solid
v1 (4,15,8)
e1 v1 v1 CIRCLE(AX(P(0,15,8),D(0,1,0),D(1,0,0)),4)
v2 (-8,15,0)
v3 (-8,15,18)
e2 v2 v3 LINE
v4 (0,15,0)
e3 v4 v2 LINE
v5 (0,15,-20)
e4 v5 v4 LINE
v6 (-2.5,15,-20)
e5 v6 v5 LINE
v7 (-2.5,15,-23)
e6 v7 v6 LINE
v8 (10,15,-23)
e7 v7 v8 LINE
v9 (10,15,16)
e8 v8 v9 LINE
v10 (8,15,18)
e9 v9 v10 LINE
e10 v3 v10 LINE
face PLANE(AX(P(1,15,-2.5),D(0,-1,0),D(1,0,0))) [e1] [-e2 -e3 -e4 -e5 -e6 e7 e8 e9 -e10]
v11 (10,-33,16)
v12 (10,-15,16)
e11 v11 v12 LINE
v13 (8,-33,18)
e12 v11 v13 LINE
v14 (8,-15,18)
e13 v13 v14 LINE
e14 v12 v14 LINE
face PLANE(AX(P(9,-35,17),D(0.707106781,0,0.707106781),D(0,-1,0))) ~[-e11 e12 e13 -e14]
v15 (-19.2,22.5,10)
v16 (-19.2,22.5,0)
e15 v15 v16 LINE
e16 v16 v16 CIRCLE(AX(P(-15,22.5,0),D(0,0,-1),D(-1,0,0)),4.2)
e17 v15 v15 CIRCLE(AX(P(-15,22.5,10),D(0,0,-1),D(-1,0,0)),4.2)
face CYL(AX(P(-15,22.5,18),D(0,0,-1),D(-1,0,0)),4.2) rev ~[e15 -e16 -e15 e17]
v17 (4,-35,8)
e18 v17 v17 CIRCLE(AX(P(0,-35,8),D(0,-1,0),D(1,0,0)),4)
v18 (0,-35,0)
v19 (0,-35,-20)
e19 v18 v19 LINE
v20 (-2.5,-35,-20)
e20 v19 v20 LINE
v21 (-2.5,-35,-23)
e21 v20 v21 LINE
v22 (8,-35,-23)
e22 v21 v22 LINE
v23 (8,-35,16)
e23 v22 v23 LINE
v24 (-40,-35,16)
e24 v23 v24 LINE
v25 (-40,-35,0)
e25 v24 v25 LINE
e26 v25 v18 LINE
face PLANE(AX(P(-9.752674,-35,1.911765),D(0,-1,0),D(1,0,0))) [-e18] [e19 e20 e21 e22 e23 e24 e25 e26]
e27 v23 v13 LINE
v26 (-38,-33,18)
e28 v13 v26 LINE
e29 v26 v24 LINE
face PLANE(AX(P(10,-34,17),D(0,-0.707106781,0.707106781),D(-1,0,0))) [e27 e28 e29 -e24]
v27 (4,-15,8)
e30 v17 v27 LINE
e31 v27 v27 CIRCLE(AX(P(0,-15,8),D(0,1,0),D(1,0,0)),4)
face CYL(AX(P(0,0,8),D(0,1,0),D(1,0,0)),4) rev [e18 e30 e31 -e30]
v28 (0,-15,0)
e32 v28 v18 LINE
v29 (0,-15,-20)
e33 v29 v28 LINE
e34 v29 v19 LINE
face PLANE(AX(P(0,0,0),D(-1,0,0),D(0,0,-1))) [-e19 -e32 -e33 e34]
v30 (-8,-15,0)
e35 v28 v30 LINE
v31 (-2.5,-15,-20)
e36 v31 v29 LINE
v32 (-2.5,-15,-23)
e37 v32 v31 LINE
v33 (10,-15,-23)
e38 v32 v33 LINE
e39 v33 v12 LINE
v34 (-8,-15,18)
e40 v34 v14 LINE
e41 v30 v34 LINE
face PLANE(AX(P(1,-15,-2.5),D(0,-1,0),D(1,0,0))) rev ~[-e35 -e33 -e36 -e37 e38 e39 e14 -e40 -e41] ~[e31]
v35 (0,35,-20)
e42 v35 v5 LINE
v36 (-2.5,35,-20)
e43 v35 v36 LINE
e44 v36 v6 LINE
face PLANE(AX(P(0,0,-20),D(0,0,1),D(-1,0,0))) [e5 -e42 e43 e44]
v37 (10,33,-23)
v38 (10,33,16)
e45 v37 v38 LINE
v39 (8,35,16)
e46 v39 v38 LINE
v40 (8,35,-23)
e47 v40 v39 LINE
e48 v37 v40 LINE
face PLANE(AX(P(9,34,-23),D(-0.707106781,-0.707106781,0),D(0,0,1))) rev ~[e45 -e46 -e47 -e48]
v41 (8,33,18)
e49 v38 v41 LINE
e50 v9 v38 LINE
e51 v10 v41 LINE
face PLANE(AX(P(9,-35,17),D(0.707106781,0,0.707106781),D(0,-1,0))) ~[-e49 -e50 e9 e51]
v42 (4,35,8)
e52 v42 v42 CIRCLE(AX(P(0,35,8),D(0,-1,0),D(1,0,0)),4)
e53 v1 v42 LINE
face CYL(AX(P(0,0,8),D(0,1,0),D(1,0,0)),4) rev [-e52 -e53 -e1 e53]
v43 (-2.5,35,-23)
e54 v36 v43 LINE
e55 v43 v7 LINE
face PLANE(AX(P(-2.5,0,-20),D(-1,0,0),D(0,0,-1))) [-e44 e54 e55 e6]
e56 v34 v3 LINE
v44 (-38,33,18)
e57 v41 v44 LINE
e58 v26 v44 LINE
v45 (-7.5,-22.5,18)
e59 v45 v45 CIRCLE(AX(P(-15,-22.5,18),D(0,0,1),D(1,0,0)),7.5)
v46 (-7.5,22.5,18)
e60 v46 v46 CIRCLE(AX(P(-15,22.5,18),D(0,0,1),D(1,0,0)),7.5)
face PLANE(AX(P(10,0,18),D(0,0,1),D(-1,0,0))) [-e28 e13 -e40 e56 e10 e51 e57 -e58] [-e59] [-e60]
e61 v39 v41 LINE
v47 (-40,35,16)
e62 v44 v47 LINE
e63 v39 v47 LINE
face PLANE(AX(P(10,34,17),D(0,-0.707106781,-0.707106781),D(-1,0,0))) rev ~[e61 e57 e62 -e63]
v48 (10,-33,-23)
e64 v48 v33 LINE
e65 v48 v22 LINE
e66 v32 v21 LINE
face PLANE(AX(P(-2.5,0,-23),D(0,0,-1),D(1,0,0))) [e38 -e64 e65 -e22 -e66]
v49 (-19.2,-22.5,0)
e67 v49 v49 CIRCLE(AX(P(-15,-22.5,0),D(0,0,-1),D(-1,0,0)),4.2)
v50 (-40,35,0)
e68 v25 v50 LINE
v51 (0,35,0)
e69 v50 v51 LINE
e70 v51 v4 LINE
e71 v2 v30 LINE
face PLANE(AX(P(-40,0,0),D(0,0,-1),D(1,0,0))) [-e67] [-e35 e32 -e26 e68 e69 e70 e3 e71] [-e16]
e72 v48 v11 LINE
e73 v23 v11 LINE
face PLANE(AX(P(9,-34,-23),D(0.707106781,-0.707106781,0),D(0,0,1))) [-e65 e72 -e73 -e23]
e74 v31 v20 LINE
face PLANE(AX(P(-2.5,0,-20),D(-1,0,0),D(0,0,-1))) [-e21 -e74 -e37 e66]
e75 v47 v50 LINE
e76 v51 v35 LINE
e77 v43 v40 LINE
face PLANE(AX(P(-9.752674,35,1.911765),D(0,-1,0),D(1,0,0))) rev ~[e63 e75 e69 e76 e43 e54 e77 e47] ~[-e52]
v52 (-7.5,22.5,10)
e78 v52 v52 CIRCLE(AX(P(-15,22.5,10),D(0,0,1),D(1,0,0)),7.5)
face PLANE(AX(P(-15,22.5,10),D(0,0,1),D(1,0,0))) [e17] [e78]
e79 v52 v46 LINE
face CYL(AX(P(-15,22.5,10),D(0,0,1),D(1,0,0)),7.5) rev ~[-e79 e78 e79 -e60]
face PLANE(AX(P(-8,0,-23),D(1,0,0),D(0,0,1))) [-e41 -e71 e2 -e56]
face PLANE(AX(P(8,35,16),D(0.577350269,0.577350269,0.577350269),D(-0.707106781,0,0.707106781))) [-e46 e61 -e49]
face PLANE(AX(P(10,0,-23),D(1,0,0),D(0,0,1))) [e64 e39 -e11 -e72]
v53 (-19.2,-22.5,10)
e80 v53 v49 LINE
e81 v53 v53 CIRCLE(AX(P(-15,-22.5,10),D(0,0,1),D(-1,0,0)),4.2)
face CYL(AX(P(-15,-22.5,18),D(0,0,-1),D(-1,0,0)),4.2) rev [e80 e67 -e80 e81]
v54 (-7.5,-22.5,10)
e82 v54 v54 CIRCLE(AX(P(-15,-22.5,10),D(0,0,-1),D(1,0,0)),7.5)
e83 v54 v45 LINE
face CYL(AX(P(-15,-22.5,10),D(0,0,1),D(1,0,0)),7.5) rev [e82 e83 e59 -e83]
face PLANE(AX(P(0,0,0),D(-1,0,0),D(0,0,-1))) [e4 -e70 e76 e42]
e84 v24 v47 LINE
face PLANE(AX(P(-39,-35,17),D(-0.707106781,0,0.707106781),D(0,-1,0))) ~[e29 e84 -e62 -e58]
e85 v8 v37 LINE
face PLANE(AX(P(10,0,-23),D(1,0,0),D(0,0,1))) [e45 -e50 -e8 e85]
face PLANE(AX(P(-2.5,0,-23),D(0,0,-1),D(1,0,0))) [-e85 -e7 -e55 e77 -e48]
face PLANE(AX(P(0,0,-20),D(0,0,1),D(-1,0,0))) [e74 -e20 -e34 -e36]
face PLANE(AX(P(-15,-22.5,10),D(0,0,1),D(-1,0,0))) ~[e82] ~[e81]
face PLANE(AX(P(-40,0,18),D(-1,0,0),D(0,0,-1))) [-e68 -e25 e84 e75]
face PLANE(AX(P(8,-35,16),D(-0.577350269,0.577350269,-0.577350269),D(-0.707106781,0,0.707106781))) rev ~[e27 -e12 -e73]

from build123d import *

# Parameters (mm, degrees)
F0_R           = 4
F1_DEPTH       = 35
F3_SIZE        = 2
F2_W           = 18
F2_H           = 41
F4_DEPTH       = 15
F6_D           = 8.4
F6_CBORE_D     = 15
F6_CBORE_DEPTH = 8


# Not quite as in the source:
# - a pattern or mirror of a feature is missing from the dataset's text; its kind, count and spacing are read off the source's solid


with BuildPart() as f1:
    # F0 (on Front) → F1 (new body, symmetric)
    with BuildSketch(Plane.XZ):
        Polygon((-40, 0), (0, 0), (0, -20), (-2.5, -20), (-2.5, -23), (10, -23), (10, 18), (-40, 18), align=None)
        with Locations((0, 8)):
            Circle(F0_R, mode=Mode.SUBTRACT)
    extrude(amount=F1_DEPTH, both=True)

    # F3
    f3_edges = [f1.edges().sort_by_distance(p)[0] for p in [
        (10, 0, 18),
        (10, -35, -2.5),
        (10, 35, -2.5),
        (-15, 35, 18),
        (-15, -35, 18),
        (-40, 0, 18),
    ]]
    chamfer(f3_edges, length=F3_SIZE)

    # F2 (on Front) → F4 (cut, symmetric)
    with BuildSketch(Plane.XZ):
        with Locations((1, -2.5)):
            Rectangle(F2_W, F2_H)
    extrude(amount=F4_DEPTH, both=True, mode=Mode.SUBTRACT)

    # F6 (through all)
    with Locations(Plane.XY.offset(18)):
        with Locations((-15, 22.5)):
            f6 = CounterBoreHole(F6_D / 2, F6_CBORE_D / 2, F6_CBORE_DEPTH)

    # F6_copies: F6 across plane
    add(f6.mirror(Plane(origin=(0, 0, 0), x_dir=(0, 0, -1), z_dir=(0, -1, 0))), mode=Mode.SUBTRACT)


solid = f1.part
